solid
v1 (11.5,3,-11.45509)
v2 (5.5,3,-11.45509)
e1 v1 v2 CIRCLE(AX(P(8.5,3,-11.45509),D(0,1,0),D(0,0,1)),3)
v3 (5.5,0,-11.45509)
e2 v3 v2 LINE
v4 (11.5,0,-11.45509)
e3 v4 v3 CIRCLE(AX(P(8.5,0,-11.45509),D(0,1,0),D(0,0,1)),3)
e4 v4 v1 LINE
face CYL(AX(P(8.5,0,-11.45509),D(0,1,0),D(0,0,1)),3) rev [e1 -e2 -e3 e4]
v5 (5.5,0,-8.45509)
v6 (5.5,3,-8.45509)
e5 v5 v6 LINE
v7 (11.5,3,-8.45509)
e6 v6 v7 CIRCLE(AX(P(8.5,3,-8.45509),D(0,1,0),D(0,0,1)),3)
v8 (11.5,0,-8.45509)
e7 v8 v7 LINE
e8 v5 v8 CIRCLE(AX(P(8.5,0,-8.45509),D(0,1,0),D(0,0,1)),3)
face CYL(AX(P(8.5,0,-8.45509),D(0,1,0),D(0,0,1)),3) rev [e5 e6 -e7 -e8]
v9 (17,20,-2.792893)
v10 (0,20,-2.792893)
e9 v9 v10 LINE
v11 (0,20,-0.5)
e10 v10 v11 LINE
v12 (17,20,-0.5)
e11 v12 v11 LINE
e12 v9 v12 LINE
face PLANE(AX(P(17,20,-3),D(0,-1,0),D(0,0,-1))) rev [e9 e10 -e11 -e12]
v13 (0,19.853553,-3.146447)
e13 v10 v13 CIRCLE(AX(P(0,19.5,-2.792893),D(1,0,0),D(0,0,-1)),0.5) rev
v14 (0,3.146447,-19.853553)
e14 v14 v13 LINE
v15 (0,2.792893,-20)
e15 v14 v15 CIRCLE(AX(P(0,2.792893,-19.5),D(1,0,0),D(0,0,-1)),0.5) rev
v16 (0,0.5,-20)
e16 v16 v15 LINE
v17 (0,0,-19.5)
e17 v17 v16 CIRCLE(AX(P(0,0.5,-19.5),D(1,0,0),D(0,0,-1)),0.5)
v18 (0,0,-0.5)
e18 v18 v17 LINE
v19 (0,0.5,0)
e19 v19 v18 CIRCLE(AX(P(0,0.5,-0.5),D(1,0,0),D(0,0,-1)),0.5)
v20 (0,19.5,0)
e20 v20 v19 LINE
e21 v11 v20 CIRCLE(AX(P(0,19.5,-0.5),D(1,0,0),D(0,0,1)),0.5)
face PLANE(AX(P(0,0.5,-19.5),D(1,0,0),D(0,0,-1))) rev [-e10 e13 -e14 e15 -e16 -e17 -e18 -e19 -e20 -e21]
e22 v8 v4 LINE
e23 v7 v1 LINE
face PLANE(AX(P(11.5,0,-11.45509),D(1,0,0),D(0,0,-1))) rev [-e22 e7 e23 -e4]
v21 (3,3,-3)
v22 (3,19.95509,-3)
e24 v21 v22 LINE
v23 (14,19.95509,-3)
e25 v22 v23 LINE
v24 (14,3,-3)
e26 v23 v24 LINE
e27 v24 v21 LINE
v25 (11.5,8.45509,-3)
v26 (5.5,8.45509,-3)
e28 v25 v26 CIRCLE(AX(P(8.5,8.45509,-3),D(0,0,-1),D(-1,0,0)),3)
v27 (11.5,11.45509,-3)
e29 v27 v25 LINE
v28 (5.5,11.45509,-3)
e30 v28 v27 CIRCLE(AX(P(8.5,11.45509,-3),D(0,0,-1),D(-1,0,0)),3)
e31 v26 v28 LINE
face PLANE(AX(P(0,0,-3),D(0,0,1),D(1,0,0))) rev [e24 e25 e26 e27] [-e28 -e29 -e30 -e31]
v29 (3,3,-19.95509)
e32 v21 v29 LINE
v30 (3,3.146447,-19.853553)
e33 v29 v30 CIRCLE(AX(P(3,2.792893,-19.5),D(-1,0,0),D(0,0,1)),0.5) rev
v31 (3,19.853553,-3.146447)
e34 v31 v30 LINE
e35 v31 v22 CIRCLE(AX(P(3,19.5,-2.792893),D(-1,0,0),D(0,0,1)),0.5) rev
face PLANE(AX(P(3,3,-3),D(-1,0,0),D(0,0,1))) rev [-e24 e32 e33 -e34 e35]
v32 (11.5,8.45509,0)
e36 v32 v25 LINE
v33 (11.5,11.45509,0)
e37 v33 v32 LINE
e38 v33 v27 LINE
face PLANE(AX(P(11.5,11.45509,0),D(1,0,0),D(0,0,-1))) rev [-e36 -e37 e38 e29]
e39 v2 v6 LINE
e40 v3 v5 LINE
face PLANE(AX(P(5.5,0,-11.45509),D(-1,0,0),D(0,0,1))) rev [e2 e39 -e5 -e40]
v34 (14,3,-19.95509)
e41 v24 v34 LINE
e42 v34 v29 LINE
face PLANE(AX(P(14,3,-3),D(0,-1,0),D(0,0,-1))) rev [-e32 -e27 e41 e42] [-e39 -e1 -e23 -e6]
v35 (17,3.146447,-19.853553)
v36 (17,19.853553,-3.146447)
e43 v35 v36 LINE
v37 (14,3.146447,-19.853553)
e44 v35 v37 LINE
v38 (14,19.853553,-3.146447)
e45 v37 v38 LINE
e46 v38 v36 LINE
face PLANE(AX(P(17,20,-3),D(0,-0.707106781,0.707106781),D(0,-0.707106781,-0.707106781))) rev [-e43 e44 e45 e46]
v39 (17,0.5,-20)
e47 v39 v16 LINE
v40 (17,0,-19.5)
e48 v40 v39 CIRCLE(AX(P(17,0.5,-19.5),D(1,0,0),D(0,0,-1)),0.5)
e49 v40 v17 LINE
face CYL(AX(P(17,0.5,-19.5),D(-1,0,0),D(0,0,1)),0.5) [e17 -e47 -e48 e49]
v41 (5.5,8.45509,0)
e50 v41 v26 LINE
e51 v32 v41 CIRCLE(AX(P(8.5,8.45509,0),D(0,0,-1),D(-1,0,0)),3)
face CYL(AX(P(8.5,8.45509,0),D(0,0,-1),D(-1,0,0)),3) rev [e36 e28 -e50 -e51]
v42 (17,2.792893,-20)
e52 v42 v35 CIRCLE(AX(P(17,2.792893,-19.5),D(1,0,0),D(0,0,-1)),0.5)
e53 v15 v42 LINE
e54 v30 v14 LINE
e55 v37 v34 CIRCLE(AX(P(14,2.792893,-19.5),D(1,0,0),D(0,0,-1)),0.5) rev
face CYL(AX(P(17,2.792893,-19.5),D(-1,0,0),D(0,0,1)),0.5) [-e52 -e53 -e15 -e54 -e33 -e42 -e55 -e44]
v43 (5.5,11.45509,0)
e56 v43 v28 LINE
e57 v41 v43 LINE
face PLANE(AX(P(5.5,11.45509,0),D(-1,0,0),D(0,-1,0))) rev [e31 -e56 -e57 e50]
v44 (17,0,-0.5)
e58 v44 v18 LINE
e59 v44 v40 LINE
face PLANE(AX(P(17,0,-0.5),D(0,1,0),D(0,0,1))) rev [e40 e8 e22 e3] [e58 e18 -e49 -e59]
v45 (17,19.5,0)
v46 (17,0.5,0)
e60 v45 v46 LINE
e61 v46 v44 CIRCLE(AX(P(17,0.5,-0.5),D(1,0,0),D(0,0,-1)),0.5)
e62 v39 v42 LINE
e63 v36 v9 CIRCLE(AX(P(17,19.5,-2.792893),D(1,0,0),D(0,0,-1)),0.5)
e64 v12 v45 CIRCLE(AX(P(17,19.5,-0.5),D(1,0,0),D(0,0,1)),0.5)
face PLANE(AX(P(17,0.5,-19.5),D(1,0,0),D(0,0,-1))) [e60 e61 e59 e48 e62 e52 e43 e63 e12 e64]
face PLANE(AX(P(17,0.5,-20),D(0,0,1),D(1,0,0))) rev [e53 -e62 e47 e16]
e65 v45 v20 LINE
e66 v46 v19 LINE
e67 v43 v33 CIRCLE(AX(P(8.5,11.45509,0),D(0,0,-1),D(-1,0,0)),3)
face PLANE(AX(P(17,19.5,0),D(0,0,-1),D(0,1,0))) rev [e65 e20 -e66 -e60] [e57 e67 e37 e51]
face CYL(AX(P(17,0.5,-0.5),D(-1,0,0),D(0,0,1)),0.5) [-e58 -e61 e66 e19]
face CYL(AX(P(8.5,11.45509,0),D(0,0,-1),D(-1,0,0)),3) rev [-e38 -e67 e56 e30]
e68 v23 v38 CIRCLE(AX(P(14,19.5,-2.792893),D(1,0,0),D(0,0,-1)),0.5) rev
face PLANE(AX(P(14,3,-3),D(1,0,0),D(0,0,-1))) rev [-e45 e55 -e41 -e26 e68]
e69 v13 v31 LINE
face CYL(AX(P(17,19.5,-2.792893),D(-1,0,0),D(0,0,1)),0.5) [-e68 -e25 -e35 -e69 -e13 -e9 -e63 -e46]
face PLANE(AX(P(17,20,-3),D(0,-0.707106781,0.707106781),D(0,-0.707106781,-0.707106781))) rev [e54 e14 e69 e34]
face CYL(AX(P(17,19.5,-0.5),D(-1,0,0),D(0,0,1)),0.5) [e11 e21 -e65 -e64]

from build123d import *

# Parameters (mm, degrees)
ESTRUSIONE_ESTRUSIONE1_DEPTH = 17
SCHIZZO4_W                   = 11
SCHIZZO4_H                   = 17
TAGLIO_ESTRUSIONE3_DEPTH     = 17
RACCORDO3_START              = -1
RACCORDO3_DEPTH              = 19
TAGLIO_ESTRUSIONE4_DEPTH     = 32.272991542
TAGLIO_ESTRUSIONE5_DEPTH     = 32.272991542


with BuildPart() as part:
    # Schizzo1 → Estrusione-Estrusione1 (new body)
    with BuildSketch(Plane(origin=(0, 0, 0), x_dir=(0, 0, -1), z_dir=(1, 0, 0))):
        with BuildLine():
            Line((0, 19.5), (0, 0.5))
            ThreePointArc((0, 0.5), (0.146446609, 0.146446609), (0.5, 0))
            Line((0.5, 0), (19.5, 0))
            ThreePointArc((19.5, 0), (19.853553391, 0.146446609), (20, 0.5))
            Line((20, 0.5), (20, 3))
            Line((20, 3), (3, 20))
            Line((3, 20), (0.5, 20))
            ThreePointArc((0.5, 20), (0.146446609, 19.853553391), (0, 19.5))
        make_face()
    extrude(amount=ESTRUSIONE_ESTRUSIONE1_DEPTH)

    # Schizzo4 → Taglio-Estrusione3 (cut)
    with BuildSketch(Plane(origin=(0, 0, -20), x_dir=(-1, 0, 0), z_dir=(0, 0, -1))):
        with Locations((-8.5, 11.5)):
            Rectangle(SCHIZZO4_W, SCHIZZO4_H)
    extrude(amount=-TAGLIO_ESTRUSIONE3_DEPTH, mode=Mode.SUBTRACT)

    # Raccordo3: read off the stored shape, not the designer's step
    # Raccordo3 outline → Raccordo3 (cut)
    with BuildSketch(Plane.YZ.offset(RACCORDO3_START)):
        with BuildLine():
            Line((3, -20), (3.146446609, -19.853553391))
            ThreePointArc((3.146446609, -19.853553391), (2.984234935, -19.961939766), (2.792893219, -20))
            Line((2.792893219, -20), (3, -20))
        make_face()
        with BuildLine():
            Line((19.853553391, -3.146446609), (20, -3))
            Line((20, -3), (20, -2.792893219))
            ThreePointArc((20, -2.792893219), (19.961939766, -2.984234935), (19.853553391, -3.146446609))
        make_face()
    extrude(amount=RACCORDO3_DEPTH, mode=Mode.SUBTRACT)

    # Schizzo5 → Taglio-Estrusione4 (cut, through all)
    with BuildSketch(Plane(origin=(0, 3, 0), x_dir=(1, 0, 0), z_dir=(0, 1, 0))):
        with BuildLine():
            Line((11.5, 11.455089861), (11.5, 8.455089861))
            ThreePointArc((11.5, 8.455089861), (8.5, 5.455089861), (5.5, 8.455089861))
            Line((5.5, 8.455089861), (5.5, 11.455089861))
            ThreePointArc((5.5, 11.455089861), (8.5, 14.455089861), (11.5, 11.455089861))
        make_face()
    extrude(amount=-TAGLIO_ESTRUSIONE4_DEPTH, mode=Mode.SUBTRACT)

    # Schizzo6 → Taglio-Estrusione5 (cut, through all)
    with BuildSketch(Plane(origin=(0, 0, -3), x_dir=(-1, 0, 0), z_dir=(0, 0, -1))):
        with BuildLine():
            Line((-5.5, 11.455089861), (-5.5, 8.455089861))
            ThreePointArc((-5.5, 8.455089861), (-8.5, 5.455089861), (-11.5, 8.455089861))
            Line((-11.5, 8.455089861), (-11.5, 11.455089861))
            ThreePointArc((-11.5, 11.455089861), (-8.5, 14.455089861), (-5.5, 11.455089861))
        make_face()
    extrude(amount=-TAGLIO_ESTRUSIONE5_DEPTH, mode=Mode.SUBTRACT)


solid = part.part
